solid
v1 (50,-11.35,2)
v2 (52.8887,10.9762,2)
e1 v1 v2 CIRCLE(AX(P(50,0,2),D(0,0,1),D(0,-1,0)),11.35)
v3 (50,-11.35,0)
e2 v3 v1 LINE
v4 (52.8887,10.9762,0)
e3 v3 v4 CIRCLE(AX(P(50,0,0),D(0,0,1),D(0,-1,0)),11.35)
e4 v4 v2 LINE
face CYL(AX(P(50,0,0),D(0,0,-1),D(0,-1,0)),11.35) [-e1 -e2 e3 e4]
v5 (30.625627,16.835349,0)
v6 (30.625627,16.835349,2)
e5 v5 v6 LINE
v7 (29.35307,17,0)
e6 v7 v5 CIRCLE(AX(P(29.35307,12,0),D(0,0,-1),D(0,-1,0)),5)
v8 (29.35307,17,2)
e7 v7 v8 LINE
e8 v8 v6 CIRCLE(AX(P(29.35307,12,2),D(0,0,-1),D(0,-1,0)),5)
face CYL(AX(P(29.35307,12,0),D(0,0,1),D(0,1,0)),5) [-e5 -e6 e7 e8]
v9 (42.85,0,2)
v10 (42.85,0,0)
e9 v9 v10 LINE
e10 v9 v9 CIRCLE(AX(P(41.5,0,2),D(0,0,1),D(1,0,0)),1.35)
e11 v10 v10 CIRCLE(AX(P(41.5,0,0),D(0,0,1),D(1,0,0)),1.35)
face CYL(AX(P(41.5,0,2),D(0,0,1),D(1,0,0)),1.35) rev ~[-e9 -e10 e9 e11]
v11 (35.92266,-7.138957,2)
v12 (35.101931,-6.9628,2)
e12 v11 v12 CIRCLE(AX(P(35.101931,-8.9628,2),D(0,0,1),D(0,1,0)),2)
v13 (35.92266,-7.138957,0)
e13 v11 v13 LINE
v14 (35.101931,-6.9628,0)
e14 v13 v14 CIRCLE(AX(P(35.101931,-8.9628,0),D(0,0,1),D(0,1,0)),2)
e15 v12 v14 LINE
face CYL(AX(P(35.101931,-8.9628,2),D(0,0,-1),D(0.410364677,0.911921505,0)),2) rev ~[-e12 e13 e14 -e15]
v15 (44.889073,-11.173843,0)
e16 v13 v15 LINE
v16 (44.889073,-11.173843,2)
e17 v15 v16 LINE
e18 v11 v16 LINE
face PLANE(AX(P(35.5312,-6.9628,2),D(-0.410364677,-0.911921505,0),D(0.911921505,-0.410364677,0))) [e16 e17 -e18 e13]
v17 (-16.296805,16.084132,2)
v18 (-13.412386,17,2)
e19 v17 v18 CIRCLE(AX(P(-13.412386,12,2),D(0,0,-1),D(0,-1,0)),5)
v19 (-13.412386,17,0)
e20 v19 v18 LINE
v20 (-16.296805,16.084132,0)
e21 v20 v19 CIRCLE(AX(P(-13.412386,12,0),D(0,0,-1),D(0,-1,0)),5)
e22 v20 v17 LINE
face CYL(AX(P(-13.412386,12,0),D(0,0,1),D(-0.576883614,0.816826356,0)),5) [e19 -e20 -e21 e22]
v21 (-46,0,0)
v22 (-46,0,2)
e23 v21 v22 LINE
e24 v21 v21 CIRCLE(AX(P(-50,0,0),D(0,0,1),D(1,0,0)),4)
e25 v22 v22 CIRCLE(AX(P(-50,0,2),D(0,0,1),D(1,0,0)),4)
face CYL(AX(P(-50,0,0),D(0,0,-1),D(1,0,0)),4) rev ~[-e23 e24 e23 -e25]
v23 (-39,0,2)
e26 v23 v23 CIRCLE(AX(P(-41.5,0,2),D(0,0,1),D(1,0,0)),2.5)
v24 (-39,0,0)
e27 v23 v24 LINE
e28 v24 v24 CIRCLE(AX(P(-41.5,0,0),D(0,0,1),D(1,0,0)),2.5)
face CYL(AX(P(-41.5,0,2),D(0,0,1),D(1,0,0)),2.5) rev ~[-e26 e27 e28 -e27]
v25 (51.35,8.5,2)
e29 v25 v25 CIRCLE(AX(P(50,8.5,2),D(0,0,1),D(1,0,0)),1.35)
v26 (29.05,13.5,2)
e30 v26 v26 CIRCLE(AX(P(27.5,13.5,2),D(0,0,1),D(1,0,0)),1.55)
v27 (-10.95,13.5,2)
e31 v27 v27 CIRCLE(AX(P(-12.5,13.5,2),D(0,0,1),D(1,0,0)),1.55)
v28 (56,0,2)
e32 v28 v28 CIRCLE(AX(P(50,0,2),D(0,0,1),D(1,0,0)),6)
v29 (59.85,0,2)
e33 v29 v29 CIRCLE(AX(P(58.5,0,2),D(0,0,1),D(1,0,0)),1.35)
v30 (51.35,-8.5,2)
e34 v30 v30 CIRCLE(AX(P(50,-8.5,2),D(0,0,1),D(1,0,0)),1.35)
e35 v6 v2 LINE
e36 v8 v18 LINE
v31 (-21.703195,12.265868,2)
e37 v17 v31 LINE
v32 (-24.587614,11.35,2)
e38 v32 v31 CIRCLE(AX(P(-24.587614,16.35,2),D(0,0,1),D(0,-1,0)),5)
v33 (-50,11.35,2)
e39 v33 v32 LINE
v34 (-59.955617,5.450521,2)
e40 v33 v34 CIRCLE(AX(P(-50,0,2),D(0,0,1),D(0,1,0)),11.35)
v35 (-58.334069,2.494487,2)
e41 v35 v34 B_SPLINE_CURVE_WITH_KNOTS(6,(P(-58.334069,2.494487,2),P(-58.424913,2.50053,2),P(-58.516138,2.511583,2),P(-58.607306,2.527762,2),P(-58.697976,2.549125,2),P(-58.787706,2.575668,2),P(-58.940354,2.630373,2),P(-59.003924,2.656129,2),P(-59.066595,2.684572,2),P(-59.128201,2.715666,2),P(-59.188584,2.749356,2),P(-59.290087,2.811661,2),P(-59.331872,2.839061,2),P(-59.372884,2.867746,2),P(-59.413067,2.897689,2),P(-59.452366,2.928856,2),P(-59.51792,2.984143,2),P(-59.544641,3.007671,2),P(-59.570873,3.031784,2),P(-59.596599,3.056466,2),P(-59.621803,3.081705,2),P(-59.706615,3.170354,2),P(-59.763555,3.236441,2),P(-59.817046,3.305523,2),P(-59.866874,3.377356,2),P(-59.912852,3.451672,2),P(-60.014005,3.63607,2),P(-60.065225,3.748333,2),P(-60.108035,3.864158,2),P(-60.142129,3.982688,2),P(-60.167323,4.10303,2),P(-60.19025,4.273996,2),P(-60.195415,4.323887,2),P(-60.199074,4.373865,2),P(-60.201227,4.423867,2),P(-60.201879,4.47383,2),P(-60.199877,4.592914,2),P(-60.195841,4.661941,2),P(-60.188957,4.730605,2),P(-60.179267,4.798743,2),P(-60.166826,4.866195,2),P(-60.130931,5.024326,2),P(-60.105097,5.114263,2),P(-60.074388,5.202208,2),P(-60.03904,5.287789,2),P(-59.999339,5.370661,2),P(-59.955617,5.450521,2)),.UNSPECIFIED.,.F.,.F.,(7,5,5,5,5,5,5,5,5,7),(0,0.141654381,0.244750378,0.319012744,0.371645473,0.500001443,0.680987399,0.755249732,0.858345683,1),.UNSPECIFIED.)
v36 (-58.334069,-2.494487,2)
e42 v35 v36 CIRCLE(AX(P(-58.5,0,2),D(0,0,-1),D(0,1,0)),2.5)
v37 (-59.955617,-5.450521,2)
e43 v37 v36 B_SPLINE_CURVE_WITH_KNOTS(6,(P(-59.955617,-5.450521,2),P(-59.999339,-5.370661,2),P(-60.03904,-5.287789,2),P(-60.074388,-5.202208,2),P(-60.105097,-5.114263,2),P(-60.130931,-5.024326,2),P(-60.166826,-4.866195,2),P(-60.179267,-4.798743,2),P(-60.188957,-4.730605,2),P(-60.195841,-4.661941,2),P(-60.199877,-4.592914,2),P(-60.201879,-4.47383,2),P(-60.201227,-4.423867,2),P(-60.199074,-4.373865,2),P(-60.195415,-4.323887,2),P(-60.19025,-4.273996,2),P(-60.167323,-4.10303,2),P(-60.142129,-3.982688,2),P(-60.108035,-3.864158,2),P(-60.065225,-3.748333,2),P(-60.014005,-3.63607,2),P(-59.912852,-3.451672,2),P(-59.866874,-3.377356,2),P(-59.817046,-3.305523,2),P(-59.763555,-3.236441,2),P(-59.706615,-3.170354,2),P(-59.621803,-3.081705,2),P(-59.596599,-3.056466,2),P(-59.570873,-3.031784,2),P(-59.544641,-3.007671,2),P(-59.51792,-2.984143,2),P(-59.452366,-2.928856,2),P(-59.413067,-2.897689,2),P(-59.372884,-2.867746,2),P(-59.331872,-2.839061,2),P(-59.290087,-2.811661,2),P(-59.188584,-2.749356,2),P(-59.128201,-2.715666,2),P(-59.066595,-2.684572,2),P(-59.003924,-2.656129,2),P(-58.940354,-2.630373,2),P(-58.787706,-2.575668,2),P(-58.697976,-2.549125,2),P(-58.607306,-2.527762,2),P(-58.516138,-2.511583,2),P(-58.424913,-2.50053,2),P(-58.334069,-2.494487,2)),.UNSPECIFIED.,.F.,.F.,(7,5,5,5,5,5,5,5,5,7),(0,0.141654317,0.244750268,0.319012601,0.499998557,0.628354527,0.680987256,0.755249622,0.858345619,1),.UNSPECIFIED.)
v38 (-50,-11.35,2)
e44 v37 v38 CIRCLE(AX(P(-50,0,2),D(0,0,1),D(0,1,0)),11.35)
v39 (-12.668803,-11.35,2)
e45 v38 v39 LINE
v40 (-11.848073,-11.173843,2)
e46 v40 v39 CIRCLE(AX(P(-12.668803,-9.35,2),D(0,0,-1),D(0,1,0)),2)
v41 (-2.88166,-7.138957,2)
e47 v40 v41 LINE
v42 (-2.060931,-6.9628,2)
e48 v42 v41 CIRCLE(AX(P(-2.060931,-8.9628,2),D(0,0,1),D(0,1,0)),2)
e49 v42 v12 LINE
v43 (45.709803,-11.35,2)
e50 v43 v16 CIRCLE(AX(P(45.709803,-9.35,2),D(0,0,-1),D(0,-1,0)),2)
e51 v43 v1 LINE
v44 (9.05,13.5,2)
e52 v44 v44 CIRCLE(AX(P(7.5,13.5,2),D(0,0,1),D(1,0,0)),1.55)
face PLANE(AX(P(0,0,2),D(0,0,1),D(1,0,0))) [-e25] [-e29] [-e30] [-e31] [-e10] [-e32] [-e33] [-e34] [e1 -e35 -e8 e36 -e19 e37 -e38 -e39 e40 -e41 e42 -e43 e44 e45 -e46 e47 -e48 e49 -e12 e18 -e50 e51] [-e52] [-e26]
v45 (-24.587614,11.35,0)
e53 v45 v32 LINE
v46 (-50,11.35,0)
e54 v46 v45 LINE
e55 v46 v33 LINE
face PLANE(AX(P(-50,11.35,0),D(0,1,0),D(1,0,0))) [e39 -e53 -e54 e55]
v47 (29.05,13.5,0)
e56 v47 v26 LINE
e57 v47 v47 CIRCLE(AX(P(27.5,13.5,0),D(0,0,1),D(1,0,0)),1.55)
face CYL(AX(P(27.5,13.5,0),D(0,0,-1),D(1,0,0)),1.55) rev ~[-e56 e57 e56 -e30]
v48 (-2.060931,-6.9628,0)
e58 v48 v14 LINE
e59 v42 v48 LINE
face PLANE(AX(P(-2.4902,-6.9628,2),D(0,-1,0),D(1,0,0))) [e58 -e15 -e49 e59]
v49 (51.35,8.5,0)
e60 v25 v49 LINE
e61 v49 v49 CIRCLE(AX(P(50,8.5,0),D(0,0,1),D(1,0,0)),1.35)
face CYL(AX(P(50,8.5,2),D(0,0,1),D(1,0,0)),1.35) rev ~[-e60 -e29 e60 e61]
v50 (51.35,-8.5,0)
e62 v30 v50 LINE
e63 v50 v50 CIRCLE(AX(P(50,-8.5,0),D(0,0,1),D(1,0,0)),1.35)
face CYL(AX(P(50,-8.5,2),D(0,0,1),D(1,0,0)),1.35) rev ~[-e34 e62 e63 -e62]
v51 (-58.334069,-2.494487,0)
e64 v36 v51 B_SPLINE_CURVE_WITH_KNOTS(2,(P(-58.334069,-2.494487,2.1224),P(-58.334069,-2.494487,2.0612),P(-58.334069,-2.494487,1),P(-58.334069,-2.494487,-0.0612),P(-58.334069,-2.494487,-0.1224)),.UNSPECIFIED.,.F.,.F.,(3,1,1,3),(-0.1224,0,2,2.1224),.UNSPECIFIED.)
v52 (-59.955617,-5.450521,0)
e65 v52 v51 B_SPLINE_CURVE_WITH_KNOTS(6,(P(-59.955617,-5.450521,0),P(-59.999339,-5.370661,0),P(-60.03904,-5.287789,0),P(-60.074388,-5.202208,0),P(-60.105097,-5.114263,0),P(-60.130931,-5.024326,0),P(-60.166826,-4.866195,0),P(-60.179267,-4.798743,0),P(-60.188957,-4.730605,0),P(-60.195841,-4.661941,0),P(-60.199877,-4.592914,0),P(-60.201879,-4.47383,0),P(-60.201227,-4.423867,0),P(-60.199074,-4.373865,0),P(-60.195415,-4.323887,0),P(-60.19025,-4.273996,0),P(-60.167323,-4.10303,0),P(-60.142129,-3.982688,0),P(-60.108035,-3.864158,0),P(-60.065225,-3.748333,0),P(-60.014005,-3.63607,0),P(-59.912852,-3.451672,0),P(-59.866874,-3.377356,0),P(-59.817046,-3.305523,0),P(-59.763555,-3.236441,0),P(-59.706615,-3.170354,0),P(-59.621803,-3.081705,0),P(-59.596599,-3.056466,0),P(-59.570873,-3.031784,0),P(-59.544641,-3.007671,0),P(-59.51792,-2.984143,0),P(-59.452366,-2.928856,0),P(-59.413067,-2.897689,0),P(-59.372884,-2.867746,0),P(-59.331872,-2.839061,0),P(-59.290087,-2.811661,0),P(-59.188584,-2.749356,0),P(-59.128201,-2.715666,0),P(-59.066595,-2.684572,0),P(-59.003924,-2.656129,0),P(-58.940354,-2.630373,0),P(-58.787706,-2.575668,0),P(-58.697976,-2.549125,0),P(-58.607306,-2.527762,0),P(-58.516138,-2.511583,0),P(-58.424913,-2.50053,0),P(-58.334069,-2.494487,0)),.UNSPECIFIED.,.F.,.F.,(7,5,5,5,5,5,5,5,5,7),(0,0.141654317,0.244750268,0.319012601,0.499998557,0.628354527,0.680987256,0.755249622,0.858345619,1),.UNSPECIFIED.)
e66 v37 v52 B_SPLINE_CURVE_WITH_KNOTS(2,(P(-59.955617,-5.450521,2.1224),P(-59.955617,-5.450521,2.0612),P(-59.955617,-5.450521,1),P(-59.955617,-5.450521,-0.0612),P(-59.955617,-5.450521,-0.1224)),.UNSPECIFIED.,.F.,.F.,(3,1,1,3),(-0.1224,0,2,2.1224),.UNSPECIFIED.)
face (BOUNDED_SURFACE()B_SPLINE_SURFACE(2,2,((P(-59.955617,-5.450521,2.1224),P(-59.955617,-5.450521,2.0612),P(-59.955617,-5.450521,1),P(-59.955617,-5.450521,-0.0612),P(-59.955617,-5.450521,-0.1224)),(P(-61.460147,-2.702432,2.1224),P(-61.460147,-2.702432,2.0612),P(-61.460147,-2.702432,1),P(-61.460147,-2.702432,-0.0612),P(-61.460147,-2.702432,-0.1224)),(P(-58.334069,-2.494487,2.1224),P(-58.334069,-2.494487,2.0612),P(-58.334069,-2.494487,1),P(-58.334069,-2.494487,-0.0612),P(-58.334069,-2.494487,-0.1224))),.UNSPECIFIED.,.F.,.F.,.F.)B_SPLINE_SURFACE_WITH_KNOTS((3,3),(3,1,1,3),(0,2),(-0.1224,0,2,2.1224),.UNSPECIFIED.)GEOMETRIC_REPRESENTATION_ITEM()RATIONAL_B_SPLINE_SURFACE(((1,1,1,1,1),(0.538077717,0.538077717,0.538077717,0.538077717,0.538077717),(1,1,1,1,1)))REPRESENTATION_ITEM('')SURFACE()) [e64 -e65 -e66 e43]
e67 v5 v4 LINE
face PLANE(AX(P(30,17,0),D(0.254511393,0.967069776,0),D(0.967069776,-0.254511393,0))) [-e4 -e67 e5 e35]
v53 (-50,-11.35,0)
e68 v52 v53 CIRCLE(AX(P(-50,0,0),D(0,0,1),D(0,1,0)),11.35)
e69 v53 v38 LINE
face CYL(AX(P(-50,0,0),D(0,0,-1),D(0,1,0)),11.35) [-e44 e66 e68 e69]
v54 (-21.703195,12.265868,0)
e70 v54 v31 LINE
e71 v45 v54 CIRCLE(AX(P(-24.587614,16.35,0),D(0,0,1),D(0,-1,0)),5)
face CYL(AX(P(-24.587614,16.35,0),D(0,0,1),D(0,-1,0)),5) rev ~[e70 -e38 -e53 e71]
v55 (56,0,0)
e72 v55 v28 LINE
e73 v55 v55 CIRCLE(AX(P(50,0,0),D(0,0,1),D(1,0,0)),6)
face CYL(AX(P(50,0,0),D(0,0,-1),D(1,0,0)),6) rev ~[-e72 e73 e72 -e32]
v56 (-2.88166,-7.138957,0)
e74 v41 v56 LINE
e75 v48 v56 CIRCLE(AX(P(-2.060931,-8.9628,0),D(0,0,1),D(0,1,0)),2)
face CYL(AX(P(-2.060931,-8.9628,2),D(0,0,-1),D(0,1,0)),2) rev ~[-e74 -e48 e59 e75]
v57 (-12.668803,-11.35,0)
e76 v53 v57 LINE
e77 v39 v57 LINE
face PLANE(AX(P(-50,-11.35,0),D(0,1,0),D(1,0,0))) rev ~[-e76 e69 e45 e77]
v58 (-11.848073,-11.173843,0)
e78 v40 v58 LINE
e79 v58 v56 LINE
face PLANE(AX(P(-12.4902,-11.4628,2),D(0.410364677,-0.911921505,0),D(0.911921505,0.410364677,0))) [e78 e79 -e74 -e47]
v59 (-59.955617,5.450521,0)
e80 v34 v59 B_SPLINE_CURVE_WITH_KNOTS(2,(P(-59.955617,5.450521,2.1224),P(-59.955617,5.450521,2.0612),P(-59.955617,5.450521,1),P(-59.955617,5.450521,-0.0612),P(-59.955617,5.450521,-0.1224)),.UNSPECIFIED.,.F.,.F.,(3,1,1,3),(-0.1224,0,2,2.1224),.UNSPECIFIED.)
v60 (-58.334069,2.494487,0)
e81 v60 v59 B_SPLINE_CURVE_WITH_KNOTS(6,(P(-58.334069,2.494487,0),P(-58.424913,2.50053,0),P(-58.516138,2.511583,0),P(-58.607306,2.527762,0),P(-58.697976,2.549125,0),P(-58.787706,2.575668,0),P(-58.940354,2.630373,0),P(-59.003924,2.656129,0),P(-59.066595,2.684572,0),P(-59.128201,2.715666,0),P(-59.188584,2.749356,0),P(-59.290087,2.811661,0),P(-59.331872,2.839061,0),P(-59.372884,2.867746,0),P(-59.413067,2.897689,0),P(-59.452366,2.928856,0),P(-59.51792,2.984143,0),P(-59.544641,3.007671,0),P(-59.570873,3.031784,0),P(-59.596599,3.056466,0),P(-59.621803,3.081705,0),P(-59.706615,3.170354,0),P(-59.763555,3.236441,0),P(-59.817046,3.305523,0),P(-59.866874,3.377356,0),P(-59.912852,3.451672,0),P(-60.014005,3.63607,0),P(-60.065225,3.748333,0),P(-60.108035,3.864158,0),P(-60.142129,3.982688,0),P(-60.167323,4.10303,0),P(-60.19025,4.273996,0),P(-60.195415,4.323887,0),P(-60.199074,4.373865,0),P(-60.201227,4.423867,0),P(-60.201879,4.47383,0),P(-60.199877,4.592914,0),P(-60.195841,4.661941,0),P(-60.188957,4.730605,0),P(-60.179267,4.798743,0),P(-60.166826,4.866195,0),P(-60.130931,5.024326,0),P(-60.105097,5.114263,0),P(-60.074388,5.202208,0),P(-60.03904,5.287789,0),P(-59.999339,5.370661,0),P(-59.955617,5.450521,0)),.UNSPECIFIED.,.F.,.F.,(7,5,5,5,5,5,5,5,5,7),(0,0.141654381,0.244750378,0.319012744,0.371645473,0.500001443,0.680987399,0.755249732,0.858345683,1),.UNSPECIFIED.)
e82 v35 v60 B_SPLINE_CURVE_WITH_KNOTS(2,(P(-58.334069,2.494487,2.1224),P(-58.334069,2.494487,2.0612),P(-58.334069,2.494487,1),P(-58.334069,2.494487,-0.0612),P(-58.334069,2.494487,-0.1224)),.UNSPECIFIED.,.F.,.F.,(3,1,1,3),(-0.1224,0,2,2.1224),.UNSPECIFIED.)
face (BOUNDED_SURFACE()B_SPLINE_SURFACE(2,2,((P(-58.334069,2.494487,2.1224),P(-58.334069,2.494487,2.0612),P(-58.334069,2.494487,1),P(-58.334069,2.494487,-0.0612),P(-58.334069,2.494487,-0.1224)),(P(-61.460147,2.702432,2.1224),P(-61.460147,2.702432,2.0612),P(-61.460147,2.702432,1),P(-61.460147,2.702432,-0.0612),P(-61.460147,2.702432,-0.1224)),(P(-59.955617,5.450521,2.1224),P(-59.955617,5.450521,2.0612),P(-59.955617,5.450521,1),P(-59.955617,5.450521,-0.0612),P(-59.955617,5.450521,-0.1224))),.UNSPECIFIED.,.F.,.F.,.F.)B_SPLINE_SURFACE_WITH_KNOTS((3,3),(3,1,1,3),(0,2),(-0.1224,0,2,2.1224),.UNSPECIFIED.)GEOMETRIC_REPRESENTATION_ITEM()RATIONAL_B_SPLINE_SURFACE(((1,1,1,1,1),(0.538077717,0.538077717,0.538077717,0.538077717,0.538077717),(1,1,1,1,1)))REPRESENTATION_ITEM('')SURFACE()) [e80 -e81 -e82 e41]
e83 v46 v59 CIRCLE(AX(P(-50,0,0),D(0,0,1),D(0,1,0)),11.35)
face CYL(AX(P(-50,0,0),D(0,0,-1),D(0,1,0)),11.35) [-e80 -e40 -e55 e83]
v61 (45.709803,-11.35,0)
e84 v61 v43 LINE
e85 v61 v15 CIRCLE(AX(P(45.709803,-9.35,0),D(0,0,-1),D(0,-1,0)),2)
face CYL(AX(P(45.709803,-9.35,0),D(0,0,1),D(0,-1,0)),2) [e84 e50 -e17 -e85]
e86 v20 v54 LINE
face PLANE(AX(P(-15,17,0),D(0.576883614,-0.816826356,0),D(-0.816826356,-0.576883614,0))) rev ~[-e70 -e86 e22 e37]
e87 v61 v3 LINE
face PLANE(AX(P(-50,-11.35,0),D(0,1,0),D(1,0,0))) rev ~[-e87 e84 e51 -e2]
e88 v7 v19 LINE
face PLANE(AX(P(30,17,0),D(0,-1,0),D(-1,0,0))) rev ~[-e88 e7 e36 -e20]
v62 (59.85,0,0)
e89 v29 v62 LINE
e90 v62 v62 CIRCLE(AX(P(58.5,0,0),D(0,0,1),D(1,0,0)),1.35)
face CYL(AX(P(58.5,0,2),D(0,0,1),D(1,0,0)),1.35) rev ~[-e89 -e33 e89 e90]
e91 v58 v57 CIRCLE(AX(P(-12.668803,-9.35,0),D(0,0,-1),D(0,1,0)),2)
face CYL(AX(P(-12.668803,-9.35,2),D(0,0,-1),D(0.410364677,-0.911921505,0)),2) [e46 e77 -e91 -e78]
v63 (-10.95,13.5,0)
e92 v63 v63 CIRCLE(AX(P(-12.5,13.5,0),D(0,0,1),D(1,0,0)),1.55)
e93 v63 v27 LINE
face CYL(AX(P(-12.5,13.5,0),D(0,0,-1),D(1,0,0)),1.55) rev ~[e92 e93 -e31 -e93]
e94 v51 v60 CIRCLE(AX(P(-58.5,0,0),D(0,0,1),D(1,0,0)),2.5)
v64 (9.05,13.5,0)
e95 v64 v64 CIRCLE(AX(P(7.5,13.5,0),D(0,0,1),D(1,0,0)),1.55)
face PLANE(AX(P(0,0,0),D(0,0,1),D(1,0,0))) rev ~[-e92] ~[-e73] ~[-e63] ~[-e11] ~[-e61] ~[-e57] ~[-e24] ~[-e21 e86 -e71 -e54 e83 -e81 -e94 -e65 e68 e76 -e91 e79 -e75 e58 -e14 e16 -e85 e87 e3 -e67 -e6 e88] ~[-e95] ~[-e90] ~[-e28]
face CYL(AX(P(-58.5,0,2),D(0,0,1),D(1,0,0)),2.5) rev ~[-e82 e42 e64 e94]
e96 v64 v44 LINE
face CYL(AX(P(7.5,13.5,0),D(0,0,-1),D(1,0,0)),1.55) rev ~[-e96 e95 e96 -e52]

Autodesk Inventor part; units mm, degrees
ref_plane "YZ Plane" through (0, 0, 0) normal (1, 0, 0) x (0, 1, 0)
ref_plane "XZ Plane" through (0, 0, 0) normal (0, 1, 0) x (-1, 0, 0)
ref_plane "XY Plane" through (0, 0, 0) normal (0, 0, 1) x (1, 0, 0)
sketch "スケッチ1" plane through (0, 0, 0) normal (0, 0, 1) x (1, 0, 0)
  line L0 (-50, 0) -> (50, 0) construction
  circle A0 centre (-50, 0) radius 4
  circle A1 centre (50, 0) radius 6
  line L1 (-50, 11.35) -> (-23, 11.35)
  line L2 (-50, -11.35) -> (50, -11.35)
  arc A2 (50, -11.35) -> (50, 11.35) centre (50, 0) ccw
  line L3 (30, 17) -> (-15, 17)
  line L4 (-15, 17) -> (-23, 11.35)
  line L5 (-24.9115, 10) -> (41.8474, 10) construction
  line L6 (-15, 17) -> (-15, 10) construction
  line L7 (30, 17) -> (30, 10) construction
  circle A3 centre (27.5, 13.5) radius 1.55
  circle A4 centre (-12.5, 13.5) radius 1.55
  circle A5 centre (7.5, 13.5) radius 1.55
  line L8 (-15, 13.5) -> (30, 13.5) construction
  line L9 (30, 16) -> (-15, 16) construction
  line L10 (-15, 16) -> (-15, 11) construction
  line L11 (-15, 11) -> (30, 11) construction
  line L12 (30, 11) -> (30, 16) construction
  line L13 (-23, 11.35) -> (50, 11.35)
  arc A6 (-50, 11.35) -> (-50, -11.35) centre (-50, 0) ccw
  line L14 (7.5, 17) -> (7.5, 10.5172) construction
  line L15 (30, 17) -> (52.8887, 10.9762)
  point P0 (0, 0)
  point P1 (0, 0)
  point P2 (55.7736, 9.7718)
  point P3 (38, 11.35)
  dimension "d0" = 100
  dimension "d1" = 8
  dimension "d8" = 12
  dimension "d10" = 7
  dimension "d11" = 45
  dimension "d12" = 2.5
  dimension "d13" = 3.1
  dimension "d14" = 2.5
  dimension "d15" = 20
  dimension "d17" = 5
  dimension "d18" = 11
  dimension "d69" = 11.35
  dimension "d72" = 11.35
  dimension "d87" = 8
  dimension "d88" = 8
extrude "押し出し1" add sketch "スケッチ1" along normal blind 2
fillet "フィレット1" radius 5 4 edges at (-23, 11.35, 1) (-15, 17, 1) (30, 17, 1) (-50, 11.35, 1)
sketch "スケッチ2" plane through (0, 0, 2) normal (0, 0, 1) x (1, 0, 0)
  arc A0 (50, -11.35) -> (52.8887, 10.9762) centre (50, 0) ccw projected
  line L0 (18, -20) -> (-35.4549, -20) construction
  line L1 (-76.9372, -11.5) -> (-72, -11.5)
  line L2 (-76.9372, -12.4) -> (-76.9372, -11.5)
  line L3 (-71.9872, -11.45) -> (-76.9872, -11.45)
  line L4 (-76.9872, -11.45) -> (-76.9872, -12.45)
  circle A1 centre (-50, 0) radius 4 projected
  circle A2 centre (-50, 0) radius 5.5 construction
  circle A3 centre (50, 0) radius 6 projected
  line L5 (83.3205, -17.7128) -> (50, 0) construction
  line L6 (50, 0) -> (18, -20) construction
  line L7 (83.3205, -17.7128) -> (37.8533, -17.7128) construction
  line L8 (-13.4166, -12.4128) -> (46.4577, -12.4128)
  line L9 (46.4577, -12.4128) -> (46.4577, -11.5128)
  line L10 (46.4577, -11.5128) -> (45.5205, -11.5128)
  line L11 (45.5205, -11.5128) -> (35.5205, -7.0128)
  line L12 (35.5205, -7.0128) -> (-2.4795, -7.0128)
  line L13 (-2.4795, -7.0128) -> (-12.4795, -11.5128)
  line L14 (-12.4795, -11.5128) -> (-13.4166, -11.5128)
  line L15 (-13.4166, -11.5128) -> (-13.4166, -12.4128)
  line L16 (-12.4902, -11.4628) -> (-2.4902, -6.9628)
  line L17 (-2.4902, -6.9628) -> (35.5312, -6.9628)
  line L18 (35.5312, -6.9628) -> (45.5312, -11.4628)
  line L19 (45.5312, -11.4628) -> (46.5077, -11.4628)
  line L20 (46.5077, -11.4628) -> (46.5077, -12.4628)
  line L21 (46.5077, -12.4628) -> (-13.4666, -12.4628)
  line L22 (-13.4666, -12.4628) -> (-13.4666, -11.4628)
  line L23 (-13.4666, -11.4628) -> (-12.4902, -11.4628)
  point P0 (56.6914, 9.1677)
  point P1 (0, 0)
  point P2 (50, 11.35)
  dimension "d19" = 20
  dimension "d20" = 32
  dimension "d32" = 11
  dimension "d33" = 120
  dimension "d37" = 37.8
  dimension "d38" = 6.2
  dimension "d39" = 0.05
  dimension "d49" = 38
  dimension "d50" = 10
  dimension "d51" = 10
  dimension "d52" = 4.5
  dimension "d53" = 0.9
  dimension "d54" = 59.9743
extrude "押し出し2" cut sketch "スケッチ2" against normal blind 10 contours L15 L14 L13 L12 L11 L10 L9 L8 | L16 L17 L18 L19 L20 L21 L22 L23
fillet "フィレット2" radius 2 4 edges at (45.2805, -11.35, 1) (-12.2395, -11.35, 1) (35.5312, -6.9628, 1) (-2.4902, -6.9628, 1)
sketch "スケッチ4" plane through (0, 0, 2) normal (0, 0, 1) x (1, 0, 0)
  circle A0 centre (50, 0) radius 6 projected
  circle A1 centre (50, 0) radius 8.5 construction
  line L0 (50, 0) -> (50, 8.5) construction
  circle A2 centre (50, 8.5) radius 1.35
  circle A3 centre (41.5, 0) radius 1.35
  circle A4 centre (50, -8.5) radius 1.35
  circle A5 centre (58.5, 0) radius 1.35
  point P0 (0, 0)
  dimension "d61" = 17
  dimension "d62" = 2.7
  dimension "d65" = 360
extrude "押し出し4" cut sketch "スケッチ4" against normal through all contours A2 | A3 | A4 | A5
sketch "スケッチ6" plane through (0, 0, 2) normal (0, 0, 1) x (1, 0, 0)
  circle A0 centre (-50, 0) radius 4 projected
  circle A1 centre (-50, 0) radius 8.5 construction
  circle A2 centre (-58.5, 0) radius 2.5
  line L0 (-50, 0) -> (-58.5, 0) construction
  line L1 (-50, 0) -> (-41.5, 0) construction
  circle A3 centre (-41.5, 0) radius 2.5
  arc A4 (-50, 11.35) -> (-50, -11.35) centre (-50, 0) ccw projected
  line L2 (-58.5, -2.5) -> (-61.0712, -2.5)
  line L3 (-58.5, 2.5) -> (-61.0712, 2.5)
  point P0 (0, 0)
  dimension "d78" = 17
  dimension "d79" = 5
  dimension "d82" = 360
extrude "押し出し6" cut sketch "スケッチ6" against normal through all contours A2 | A2 L2 A4 L3 | A3
fillet "フィレット4" radius 2 2 edges at (-61.0712, 2.5, 1) (-61.0712, -2.5, 1)
equation "\"d14\" = d12"
properties part number "リンク_メインフレーム_6_4" material "GFRP"
